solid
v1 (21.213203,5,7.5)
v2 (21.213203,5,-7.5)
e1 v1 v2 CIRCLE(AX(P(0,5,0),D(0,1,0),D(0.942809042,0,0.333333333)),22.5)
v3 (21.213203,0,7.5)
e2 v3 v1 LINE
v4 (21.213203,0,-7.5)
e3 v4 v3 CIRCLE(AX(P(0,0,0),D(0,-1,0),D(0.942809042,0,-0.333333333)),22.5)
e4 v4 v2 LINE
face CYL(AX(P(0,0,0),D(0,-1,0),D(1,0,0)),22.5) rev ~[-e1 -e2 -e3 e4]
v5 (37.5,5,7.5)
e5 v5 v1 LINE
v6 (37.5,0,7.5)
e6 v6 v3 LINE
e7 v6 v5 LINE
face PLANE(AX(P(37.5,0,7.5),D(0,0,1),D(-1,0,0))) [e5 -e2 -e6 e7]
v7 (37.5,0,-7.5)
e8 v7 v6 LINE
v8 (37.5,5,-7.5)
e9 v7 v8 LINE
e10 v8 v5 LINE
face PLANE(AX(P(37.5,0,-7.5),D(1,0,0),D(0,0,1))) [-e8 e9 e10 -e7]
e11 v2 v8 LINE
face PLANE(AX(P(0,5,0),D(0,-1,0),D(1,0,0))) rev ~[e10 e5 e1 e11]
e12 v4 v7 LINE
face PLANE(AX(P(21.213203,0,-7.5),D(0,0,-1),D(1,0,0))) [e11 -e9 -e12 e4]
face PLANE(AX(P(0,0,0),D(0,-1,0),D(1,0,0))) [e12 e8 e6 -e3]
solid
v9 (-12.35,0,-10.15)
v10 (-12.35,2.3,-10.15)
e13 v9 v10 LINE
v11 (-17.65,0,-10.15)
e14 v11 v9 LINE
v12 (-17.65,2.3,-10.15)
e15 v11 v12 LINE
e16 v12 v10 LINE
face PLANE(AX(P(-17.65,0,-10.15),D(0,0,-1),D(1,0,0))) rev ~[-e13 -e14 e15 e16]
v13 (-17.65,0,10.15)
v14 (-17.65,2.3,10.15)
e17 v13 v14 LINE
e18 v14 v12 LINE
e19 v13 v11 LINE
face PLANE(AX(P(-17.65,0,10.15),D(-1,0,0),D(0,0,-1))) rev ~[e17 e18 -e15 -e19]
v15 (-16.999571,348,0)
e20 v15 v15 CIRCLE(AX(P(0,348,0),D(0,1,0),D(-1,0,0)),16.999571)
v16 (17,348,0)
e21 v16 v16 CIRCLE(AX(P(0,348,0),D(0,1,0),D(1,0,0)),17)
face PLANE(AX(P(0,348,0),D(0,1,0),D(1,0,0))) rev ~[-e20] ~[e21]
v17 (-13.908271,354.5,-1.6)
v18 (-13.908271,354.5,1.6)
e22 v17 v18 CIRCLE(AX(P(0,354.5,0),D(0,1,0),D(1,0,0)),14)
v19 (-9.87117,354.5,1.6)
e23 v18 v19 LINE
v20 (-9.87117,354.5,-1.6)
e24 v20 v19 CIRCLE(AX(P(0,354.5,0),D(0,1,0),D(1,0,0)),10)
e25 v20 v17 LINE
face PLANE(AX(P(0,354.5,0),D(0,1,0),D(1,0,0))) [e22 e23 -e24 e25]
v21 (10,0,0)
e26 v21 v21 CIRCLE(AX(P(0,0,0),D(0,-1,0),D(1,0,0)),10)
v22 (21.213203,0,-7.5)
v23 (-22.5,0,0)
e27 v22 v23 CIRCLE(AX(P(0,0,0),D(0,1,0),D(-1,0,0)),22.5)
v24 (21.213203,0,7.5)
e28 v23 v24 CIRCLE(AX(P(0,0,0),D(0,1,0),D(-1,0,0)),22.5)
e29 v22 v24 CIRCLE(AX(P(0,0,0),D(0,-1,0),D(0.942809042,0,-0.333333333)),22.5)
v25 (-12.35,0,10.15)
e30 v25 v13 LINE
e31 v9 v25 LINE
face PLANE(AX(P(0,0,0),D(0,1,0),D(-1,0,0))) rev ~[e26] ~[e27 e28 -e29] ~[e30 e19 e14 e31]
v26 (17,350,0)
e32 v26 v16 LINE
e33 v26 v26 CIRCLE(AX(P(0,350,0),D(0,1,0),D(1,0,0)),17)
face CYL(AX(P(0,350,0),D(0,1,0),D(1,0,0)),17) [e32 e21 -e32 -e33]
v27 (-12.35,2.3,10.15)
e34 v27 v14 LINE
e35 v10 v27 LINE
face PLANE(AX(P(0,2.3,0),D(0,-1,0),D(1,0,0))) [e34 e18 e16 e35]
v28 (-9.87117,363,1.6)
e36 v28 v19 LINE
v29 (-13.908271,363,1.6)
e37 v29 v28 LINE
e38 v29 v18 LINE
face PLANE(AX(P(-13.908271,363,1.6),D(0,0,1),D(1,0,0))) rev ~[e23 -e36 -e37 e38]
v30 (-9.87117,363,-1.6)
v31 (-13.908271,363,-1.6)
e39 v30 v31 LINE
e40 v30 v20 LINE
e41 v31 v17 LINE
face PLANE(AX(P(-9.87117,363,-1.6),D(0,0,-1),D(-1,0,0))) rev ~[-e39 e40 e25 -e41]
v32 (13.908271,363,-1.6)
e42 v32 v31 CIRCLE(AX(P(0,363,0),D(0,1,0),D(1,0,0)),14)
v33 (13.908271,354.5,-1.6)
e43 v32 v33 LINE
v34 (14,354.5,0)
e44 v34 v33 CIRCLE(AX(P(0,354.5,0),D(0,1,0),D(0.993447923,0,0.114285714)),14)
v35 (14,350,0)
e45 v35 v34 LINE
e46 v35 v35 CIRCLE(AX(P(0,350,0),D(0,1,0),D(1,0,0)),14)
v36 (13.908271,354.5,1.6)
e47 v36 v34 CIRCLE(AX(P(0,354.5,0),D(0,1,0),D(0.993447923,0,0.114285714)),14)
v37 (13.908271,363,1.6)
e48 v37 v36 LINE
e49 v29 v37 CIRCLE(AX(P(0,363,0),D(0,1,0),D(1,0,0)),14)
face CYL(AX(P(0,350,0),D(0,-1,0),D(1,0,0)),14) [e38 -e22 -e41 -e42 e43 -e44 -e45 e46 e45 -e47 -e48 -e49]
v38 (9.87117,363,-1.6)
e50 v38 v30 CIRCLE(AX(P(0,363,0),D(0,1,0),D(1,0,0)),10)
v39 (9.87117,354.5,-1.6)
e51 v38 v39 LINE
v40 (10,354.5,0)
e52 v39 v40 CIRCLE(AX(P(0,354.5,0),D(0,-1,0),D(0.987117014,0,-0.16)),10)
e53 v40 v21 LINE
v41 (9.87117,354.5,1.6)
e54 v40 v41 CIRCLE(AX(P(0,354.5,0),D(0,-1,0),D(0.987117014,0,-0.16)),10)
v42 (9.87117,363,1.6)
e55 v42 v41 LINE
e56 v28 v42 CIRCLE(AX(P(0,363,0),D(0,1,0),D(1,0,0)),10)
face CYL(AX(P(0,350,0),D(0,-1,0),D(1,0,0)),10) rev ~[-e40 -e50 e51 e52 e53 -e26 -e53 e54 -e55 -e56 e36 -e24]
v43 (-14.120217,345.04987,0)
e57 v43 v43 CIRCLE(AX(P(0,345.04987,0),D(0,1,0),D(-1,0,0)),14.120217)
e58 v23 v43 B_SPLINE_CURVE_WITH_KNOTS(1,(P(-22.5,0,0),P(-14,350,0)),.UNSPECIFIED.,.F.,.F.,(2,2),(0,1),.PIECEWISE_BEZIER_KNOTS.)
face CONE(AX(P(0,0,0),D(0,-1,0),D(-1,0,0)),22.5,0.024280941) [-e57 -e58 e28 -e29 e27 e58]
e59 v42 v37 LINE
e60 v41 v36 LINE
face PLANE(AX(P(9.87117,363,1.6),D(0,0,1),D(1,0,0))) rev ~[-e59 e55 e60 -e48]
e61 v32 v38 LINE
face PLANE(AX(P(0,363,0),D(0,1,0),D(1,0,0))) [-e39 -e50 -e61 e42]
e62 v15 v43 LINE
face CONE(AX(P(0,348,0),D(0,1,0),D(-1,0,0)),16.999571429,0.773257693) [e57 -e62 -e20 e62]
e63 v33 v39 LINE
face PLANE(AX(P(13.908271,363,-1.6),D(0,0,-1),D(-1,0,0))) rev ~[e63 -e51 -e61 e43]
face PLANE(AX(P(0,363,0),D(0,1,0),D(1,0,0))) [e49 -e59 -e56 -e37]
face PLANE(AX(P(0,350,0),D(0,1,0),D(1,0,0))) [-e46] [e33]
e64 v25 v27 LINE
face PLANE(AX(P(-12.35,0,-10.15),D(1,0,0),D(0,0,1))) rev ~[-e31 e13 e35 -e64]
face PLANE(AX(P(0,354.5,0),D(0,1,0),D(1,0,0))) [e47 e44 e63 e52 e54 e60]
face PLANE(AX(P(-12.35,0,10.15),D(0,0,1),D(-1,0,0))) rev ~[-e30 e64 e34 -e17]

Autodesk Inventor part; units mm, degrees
ref_plane "YZ Plane" through (0, 0, 0) normal (1, 0, 0) x (0, 1, 0)
ref_plane "XZ Plane" through (0, 0, 0) normal (0, 1, 0) x (-1, 0, 0)
ref_plane "XY Plane" through (0, 0, 0) normal (0, 0, 1) x (1, 0, 0)
sketch "Sketch11" plane through (0, 0, 0) normal (0, 1, 0) x (-1, 0, 0)
  circle A0 centre (0, 0) radius 14
  dimension "d24" = 28
sketch "Sketch12" plane through (0, 0, 0) normal (0, 1, 0) x (-1, 0, 0)
  circle A0 centre (0, 0) radius 22.5
  line L0 (-105, -105) -> (105, -105)
  line L1 (105, -105) -> (105, 105)
  line L2 (105, 105) -> (-105, 105)
  line L3 (-105, 105) -> (-105, -105)
  line L4 (-105, -105) -> (105, 105) construction
  line L5 (105, -105) -> (-105, 105) construction
  dimension "d25" = 45
  dimension "d37" = 210
  dimension "d38" = 210
extrude "Extrusion3" add sketch "Sketch11" along normal blind 350
loft "Loft4" add profiles "Sketch12" section 2 edges at (14, 350, 0) contours A0
sketch "Sketch13" plane through (0, 350, 0) normal (0, 1, 0) x (1, 0, 0)
  circle A0 centre (0, 0) radius 10
  dimension "d32" = 20
sketch "Sketch14" plane through (0, 0, 0) normal (0, -1, 0) x (1, 0, 0)
  circle A0 centre (0, 0) radius 10
  dimension "d39" = 20
loft "Loft5" cut profiles "Sketch14", "Sketch13"
ref_plane "Work Plane3" through (0, 363, 0) normal (0, 1, 0) x (1, 0, 0)
sketch "Sketch18" plane through (0, 363, 0) normal (0, 1, 0) x (1, 0, 0)
  point P0 (0, 0)
ref_plane "Work Plane4" through (0, 363, 0) normal (0, 1, 0) x (1, 0, 0)
ref_plane "Work Plane2" through (0, 350, 0) normal (0, 1, 0) x (1, 0, 0)
sketch "Sketch20" plane through (0, 350, 0) normal (0, 1, 0) x (1, 0, 0)
  circle A0 centre (0, 0) radius 17
  circle A1 centre (0, 0) radius 14 projected
  dimension "d57" = 34
extrude "Extrusion8" add sketch "Sketch20" against normal blind 2
sketch "Sketch21" plane through (0, 348, 0) normal (0, -1, 0) x (1, 0, 0)
  point P0 (0, 0)
chamfer "Chamfer1" distance 2.951 angle 45 1 edges at (14.0486, 348, 0)
sketch "Sketch22" plane through (0, 350, 0) normal (0, 1, 0) x (1, 0, 0)
  circle A0 centre (0, 0) radius 14
  circle A1 centre (0, 0) radius 10
  dimension "d65" = 28
extrude "Extrusion9" add sketch "Sketch22" along normal blind 13
sketch "Sketch23" plane through (0, 363, 0) normal (0, 1, 0) x (1, 0, 0)
  line L0 (-15, -1.6) -> (15, -1.6)
  line L1 (15, -1.6) -> (15, 1.6)
  line L2 (15, 1.6) -> (-15, 1.6)
  line L3 (-15, 1.6) -> (-15, -1.6)
  line L4 (-15, -1.6) -> (15, 1.6) construction
  line L5 (15, -1.6) -> (-15, 1.6) construction
  circle A0 centre (0, 0) radius 14 projected
  circle A1 centre (0, 0) radius 10 projected
  point P0 (-9.8712, -1.6)
  point P1 (-9.8712, 1.6)
  point P2 (-13.9083, 1.6)
  point P3 (-13.9083, -1.6)
  point P4 (9.8712, 1.6)
  point P5 (9.8712, -1.6)
  point P6 (13.9083, -1.6)
  point P7 (13.9083, 1.6)
  dimension "d68" = 3.2
  dimension "d69" = 30
extrude "Extrusion10" cut sketch "Sketch23" against normal blind 8.5 contours A0 L2 A1 L0 | L0 A1 L2 A0
sketch "Sketch25" plane through (0, 0, 0) normal (0, -1, 0) x (1, 0, 0)
  line L0 (37.5, 7.5) -> (7.5, 7.5)
  line L1 (7.5, 7.5) -> (7.5, -7.5)
  line L2 (7.5, -7.5) -> (37.5, -7.5)
  line L3 (37.5, -7.5) -> (37.5, 7.5)
  line L4 (37.5, 7.5) -> (7.5, -7.5) construction
  line L5 (7.5, 7.5) -> (37.5, -7.5) construction
  circle A0 centre (0, 0) radius 10 projected
  circle A1 centre (0, 0) radius 22.5 projected
  point P0 (22.5, 0)
  point P1 (21.2132, 7.5)
  point P2 (21.2132, -7.5)
  dimension "d76" = 0
  dimension "d77" = 22.5
  dimension "d78" = 15
  dimension "d80" = 15
extrude "Extrusion11" add sketch "Sketch25" against normal blind 5 contours L3 L2 A1 L0
sketch "Sketch26" plane through (0, 0, 0) normal (0, -1, 0) x (1, 0, 0)
  line L0 (-12.35, 10.15) -> (-17.65, 10.15)
  line L1 (-17.65, 10.15) -> (-17.65, -10.15)
  line L2 (-17.65, -10.15) -> (-12.35, -10.15)
  line L3 (-12.35, -10.15) -> (-12.35, 10.15)
  line L4 (-12.35, 10.15) -> (-17.65, -10.15) construction
  line L5 (-17.65, 10.15) -> (-12.35, -10.15) construction
  point P0 (0, 0)
  point P1 (-15, 0)
  dimension "d83" = 15
  dimension "d84" = 20.3
  dimension "d85" = 5.3
  dimension "d10" = 70
  dimension "d72" = 5
  dimension "d73" = 15
  dimension "d74" = 17
  dimension "d75" = 2.5
extrude "Extrusion12" cut sketch "Sketch26" against normal blind 2.3
properties part number "stozar"
